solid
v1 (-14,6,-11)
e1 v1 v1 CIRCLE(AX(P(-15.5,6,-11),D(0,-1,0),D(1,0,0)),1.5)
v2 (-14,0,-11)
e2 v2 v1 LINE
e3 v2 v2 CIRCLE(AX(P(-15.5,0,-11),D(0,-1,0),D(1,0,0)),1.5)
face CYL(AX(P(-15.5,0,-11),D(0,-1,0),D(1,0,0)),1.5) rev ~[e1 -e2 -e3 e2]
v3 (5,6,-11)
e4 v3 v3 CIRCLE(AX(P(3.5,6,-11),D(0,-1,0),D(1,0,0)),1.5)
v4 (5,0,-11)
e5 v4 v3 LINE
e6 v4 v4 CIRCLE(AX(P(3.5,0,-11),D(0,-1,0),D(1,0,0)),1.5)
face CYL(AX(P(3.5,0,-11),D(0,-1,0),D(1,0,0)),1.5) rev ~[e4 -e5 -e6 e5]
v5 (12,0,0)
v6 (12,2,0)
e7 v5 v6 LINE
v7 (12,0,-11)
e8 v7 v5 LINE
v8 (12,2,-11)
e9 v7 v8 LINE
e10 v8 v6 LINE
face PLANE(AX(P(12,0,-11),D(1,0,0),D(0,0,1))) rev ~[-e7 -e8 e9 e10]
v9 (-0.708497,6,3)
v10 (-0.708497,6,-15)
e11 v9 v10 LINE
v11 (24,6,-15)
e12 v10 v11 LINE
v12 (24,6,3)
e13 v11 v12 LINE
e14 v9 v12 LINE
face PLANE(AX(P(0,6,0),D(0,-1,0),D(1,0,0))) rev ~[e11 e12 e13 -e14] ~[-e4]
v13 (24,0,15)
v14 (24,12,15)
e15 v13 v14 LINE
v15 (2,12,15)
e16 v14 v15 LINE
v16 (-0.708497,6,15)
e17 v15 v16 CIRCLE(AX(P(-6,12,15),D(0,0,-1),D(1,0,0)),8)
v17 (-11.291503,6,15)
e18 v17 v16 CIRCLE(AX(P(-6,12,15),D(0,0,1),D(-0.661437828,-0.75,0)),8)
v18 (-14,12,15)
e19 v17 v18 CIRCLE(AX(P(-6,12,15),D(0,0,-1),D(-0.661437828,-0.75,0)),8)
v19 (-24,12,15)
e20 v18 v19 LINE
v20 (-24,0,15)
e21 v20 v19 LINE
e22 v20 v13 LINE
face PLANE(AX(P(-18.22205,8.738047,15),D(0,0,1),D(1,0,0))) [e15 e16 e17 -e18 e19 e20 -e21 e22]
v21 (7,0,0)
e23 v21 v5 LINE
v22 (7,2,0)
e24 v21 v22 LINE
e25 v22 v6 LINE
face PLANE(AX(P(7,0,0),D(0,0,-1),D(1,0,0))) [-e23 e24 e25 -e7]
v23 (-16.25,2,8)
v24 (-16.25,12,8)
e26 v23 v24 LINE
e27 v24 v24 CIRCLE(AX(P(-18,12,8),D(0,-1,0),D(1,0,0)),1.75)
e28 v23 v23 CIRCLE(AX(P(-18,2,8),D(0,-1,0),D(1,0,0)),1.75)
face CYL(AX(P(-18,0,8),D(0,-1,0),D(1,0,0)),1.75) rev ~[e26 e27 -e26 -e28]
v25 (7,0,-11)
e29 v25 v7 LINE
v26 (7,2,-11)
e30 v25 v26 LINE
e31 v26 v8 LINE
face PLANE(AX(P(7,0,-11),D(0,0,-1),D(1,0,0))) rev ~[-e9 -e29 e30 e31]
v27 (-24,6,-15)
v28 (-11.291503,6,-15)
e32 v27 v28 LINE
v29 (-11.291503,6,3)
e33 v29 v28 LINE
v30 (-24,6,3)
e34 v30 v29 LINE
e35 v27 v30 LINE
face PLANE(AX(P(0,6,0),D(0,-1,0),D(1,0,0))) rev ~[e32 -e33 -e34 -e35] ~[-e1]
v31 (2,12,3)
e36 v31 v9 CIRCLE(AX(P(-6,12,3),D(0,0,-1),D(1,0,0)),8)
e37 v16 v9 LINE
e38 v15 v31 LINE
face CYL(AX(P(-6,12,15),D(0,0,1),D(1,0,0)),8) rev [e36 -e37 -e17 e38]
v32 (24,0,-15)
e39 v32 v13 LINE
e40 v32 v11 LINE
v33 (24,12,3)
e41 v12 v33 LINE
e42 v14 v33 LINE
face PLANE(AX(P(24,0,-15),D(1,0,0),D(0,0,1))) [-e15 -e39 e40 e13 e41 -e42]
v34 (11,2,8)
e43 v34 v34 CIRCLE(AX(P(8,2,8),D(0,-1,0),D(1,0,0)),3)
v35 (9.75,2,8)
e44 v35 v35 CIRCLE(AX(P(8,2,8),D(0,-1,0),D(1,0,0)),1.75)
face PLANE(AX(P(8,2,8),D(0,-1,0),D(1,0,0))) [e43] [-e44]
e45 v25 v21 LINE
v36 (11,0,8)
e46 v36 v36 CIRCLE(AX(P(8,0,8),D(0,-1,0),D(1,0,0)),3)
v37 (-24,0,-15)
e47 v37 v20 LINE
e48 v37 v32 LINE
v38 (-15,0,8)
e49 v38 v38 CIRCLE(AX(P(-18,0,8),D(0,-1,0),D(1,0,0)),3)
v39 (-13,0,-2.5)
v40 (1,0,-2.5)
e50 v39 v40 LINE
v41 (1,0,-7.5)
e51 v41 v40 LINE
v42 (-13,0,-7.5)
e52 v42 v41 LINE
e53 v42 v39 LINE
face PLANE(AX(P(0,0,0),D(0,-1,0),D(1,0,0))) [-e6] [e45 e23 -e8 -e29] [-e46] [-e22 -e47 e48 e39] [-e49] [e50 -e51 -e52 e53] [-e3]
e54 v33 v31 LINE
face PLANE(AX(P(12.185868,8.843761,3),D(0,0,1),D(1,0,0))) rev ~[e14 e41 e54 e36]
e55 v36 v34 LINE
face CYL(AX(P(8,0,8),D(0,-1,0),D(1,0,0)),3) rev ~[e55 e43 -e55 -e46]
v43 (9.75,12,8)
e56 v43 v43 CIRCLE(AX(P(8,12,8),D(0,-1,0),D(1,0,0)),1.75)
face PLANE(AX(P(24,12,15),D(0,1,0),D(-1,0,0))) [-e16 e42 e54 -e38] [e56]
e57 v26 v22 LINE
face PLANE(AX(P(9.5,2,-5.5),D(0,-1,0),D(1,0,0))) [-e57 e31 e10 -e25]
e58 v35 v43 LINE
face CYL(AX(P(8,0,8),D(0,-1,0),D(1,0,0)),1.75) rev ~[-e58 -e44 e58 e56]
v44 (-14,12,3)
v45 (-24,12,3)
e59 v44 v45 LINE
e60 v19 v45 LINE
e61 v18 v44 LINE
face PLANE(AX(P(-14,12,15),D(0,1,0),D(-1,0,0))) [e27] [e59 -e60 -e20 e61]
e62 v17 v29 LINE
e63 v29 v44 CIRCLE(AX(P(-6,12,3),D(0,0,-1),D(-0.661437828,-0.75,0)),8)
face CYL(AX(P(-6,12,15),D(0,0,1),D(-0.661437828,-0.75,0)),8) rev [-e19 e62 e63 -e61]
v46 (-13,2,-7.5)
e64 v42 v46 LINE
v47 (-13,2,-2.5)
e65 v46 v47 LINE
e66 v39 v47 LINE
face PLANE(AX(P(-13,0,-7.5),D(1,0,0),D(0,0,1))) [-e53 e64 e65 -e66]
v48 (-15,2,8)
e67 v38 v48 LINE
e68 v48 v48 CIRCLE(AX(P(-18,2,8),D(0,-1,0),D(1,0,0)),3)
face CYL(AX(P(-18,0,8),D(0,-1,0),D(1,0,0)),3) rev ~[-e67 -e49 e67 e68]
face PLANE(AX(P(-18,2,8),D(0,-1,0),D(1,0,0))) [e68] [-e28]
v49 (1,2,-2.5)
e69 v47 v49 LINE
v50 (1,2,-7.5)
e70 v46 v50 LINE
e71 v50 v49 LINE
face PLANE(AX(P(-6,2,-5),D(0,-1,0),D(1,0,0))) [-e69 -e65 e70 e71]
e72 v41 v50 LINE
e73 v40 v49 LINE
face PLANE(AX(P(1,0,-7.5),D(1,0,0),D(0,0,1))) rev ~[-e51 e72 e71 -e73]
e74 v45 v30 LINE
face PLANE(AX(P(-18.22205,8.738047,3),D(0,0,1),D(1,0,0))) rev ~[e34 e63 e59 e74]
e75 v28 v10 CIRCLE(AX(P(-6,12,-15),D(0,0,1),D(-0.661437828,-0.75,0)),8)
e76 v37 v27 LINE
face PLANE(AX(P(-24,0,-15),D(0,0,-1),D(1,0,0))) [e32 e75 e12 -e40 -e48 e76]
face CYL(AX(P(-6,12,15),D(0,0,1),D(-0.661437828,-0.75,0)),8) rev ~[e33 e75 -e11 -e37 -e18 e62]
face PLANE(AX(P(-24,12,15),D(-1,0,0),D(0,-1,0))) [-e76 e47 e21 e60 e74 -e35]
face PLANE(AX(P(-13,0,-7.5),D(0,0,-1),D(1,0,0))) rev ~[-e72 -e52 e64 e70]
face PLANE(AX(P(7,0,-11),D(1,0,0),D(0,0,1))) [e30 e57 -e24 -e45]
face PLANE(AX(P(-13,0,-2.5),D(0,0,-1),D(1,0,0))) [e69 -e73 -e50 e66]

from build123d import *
from build123d import SkipClean  # not in build123d's __all__

# Parameters (mm, degrees)
F0_W     = 48
F0_H     = 30
F0_R     = 1.5
F0_W_2   = 14
F0_H_2   = 5
F0_W_3   = 5
F0_H_3   = 11
F0_R_2   = 3
F0_R_3   = 1.75
F1_DEPTH = 6
F2_DEPTH = 2
F5_DEPTH = 12
F6_DEPTH = 12.001
F7_DEPTH = 30.001


with BuildPart() as f1:
    # F0 (on Front) → F1 (new body)
    with BuildSketch(Plane.XZ):
        Rectangle(F0_W, F0_H)
        with Locations((-15.5, -11)):
            Circle(F0_R, mode=Mode.SUBTRACT)
        with Locations((-6, -5)):
            Rectangle(F0_W_2, F0_H_2, mode=Mode.SUBTRACT)
        with Locations((3.5, -11)):
            Circle(F0_R, mode=Mode.SUBTRACT)
        with Locations((9.5, -5.5)):
            Rectangle(F0_W_3, F0_H_3, mode=Mode.SUBTRACT)
        with Locations((-18, 8)):
            Circle(F0_R_2, mode=Mode.SUBTRACT)
        with Locations((8, 8)):
            Circle(F0_R_2, mode=Mode.SUBTRACT)
        with Locations((-6, -5)):
            Rectangle(F0_W_2, F0_H_2)
        with Locations((9.5, -5.5)):
            Rectangle(F0_W_3, F0_H_3)
        with Locations((8, 8)):
            Circle(F0_R_2)
        with Locations((8, 8)):
            Circle(F0_R_3, mode=Mode.SUBTRACT)
        with Locations((-18, 8)):
            Circle(F0_R_2)
        with Locations((-18, 8)):
            Circle(F0_R_3, mode=Mode.SUBTRACT)
    extrude(amount=-F1_DEPTH)

    # F0 (on Front) → F2 (cut)
    with BuildSketch(Plane.XZ):
        with Locations((9.5, -5.5)):
            Rectangle(F0_W_3, F0_H_3)
        with Locations((-6, -5)):
            Rectangle(F0_W_2, F0_H_2)
        with Locations((-18, 8)):
            Circle(F0_R_2)
        with Locations((-18, 8)):
            Circle(F0_R_3, mode=Mode.SUBTRACT)
        with Locations((8, 8)):
            Circle(F0_R_2)
        with Locations((8, 8)):
            Circle(F0_R_3, mode=Mode.SUBTRACT)
    extrude(amount=-F2_DEPTH, mode=Mode.SUBTRACT)

    # F4 (on face) → F5 (join)
    with BuildSketch(Plane.XY.offset(15)):
        with BuildLine():
            Line((-24, 12), (-24, 6))
            Line((-24, 6), (-11.2915026221, 6))
            ThreePointArc((-11.2915026221, 6), (-13.2915026221, 8.7084973779), (-14, 12))
            Line((-14, 12), (-24, 12))
        make_face()
        with BuildLine():
            ThreePointArc((2, 12), (1.2915026221, 8.7084973779), (-0.7084973779, 6))
            Line((-0.7084973779, 6), (24, 6))
            Line((24, 6), (24, 12))
            Line((24, 12), (2, 12))
        make_face()
    extrude(amount=-F5_DEPTH)

    # F0 (on Front) → F6 (cut, through all)
    with BuildSketch(Plane.XZ):
        with Locations((-18, 8)):
            Circle(F0_R_3)
        with Locations((8, 8)):
            Circle(F0_R_3)
    extrude(amount=-F6_DEPTH, mode=Mode.SUBTRACT)

    # F4 (on face) → F7 (cut, through all)
    with BuildSketch(Plane.XY.offset(15)):
        with BuildLine():
            Line((-0.7084973779, 6), (-11.2915026221, 6))
            ThreePointArc((-11.2915026221, 6), (-6, 4), (-0.7084973779, 6))
        make_face()
    with SkipClean():  # cleaning this boolean's faces spoils the solid; the shape is the same uncleaned
        extrude(amount=-F7_DEPTH, mode=Mode.SUBTRACT)


solid = f1.part
